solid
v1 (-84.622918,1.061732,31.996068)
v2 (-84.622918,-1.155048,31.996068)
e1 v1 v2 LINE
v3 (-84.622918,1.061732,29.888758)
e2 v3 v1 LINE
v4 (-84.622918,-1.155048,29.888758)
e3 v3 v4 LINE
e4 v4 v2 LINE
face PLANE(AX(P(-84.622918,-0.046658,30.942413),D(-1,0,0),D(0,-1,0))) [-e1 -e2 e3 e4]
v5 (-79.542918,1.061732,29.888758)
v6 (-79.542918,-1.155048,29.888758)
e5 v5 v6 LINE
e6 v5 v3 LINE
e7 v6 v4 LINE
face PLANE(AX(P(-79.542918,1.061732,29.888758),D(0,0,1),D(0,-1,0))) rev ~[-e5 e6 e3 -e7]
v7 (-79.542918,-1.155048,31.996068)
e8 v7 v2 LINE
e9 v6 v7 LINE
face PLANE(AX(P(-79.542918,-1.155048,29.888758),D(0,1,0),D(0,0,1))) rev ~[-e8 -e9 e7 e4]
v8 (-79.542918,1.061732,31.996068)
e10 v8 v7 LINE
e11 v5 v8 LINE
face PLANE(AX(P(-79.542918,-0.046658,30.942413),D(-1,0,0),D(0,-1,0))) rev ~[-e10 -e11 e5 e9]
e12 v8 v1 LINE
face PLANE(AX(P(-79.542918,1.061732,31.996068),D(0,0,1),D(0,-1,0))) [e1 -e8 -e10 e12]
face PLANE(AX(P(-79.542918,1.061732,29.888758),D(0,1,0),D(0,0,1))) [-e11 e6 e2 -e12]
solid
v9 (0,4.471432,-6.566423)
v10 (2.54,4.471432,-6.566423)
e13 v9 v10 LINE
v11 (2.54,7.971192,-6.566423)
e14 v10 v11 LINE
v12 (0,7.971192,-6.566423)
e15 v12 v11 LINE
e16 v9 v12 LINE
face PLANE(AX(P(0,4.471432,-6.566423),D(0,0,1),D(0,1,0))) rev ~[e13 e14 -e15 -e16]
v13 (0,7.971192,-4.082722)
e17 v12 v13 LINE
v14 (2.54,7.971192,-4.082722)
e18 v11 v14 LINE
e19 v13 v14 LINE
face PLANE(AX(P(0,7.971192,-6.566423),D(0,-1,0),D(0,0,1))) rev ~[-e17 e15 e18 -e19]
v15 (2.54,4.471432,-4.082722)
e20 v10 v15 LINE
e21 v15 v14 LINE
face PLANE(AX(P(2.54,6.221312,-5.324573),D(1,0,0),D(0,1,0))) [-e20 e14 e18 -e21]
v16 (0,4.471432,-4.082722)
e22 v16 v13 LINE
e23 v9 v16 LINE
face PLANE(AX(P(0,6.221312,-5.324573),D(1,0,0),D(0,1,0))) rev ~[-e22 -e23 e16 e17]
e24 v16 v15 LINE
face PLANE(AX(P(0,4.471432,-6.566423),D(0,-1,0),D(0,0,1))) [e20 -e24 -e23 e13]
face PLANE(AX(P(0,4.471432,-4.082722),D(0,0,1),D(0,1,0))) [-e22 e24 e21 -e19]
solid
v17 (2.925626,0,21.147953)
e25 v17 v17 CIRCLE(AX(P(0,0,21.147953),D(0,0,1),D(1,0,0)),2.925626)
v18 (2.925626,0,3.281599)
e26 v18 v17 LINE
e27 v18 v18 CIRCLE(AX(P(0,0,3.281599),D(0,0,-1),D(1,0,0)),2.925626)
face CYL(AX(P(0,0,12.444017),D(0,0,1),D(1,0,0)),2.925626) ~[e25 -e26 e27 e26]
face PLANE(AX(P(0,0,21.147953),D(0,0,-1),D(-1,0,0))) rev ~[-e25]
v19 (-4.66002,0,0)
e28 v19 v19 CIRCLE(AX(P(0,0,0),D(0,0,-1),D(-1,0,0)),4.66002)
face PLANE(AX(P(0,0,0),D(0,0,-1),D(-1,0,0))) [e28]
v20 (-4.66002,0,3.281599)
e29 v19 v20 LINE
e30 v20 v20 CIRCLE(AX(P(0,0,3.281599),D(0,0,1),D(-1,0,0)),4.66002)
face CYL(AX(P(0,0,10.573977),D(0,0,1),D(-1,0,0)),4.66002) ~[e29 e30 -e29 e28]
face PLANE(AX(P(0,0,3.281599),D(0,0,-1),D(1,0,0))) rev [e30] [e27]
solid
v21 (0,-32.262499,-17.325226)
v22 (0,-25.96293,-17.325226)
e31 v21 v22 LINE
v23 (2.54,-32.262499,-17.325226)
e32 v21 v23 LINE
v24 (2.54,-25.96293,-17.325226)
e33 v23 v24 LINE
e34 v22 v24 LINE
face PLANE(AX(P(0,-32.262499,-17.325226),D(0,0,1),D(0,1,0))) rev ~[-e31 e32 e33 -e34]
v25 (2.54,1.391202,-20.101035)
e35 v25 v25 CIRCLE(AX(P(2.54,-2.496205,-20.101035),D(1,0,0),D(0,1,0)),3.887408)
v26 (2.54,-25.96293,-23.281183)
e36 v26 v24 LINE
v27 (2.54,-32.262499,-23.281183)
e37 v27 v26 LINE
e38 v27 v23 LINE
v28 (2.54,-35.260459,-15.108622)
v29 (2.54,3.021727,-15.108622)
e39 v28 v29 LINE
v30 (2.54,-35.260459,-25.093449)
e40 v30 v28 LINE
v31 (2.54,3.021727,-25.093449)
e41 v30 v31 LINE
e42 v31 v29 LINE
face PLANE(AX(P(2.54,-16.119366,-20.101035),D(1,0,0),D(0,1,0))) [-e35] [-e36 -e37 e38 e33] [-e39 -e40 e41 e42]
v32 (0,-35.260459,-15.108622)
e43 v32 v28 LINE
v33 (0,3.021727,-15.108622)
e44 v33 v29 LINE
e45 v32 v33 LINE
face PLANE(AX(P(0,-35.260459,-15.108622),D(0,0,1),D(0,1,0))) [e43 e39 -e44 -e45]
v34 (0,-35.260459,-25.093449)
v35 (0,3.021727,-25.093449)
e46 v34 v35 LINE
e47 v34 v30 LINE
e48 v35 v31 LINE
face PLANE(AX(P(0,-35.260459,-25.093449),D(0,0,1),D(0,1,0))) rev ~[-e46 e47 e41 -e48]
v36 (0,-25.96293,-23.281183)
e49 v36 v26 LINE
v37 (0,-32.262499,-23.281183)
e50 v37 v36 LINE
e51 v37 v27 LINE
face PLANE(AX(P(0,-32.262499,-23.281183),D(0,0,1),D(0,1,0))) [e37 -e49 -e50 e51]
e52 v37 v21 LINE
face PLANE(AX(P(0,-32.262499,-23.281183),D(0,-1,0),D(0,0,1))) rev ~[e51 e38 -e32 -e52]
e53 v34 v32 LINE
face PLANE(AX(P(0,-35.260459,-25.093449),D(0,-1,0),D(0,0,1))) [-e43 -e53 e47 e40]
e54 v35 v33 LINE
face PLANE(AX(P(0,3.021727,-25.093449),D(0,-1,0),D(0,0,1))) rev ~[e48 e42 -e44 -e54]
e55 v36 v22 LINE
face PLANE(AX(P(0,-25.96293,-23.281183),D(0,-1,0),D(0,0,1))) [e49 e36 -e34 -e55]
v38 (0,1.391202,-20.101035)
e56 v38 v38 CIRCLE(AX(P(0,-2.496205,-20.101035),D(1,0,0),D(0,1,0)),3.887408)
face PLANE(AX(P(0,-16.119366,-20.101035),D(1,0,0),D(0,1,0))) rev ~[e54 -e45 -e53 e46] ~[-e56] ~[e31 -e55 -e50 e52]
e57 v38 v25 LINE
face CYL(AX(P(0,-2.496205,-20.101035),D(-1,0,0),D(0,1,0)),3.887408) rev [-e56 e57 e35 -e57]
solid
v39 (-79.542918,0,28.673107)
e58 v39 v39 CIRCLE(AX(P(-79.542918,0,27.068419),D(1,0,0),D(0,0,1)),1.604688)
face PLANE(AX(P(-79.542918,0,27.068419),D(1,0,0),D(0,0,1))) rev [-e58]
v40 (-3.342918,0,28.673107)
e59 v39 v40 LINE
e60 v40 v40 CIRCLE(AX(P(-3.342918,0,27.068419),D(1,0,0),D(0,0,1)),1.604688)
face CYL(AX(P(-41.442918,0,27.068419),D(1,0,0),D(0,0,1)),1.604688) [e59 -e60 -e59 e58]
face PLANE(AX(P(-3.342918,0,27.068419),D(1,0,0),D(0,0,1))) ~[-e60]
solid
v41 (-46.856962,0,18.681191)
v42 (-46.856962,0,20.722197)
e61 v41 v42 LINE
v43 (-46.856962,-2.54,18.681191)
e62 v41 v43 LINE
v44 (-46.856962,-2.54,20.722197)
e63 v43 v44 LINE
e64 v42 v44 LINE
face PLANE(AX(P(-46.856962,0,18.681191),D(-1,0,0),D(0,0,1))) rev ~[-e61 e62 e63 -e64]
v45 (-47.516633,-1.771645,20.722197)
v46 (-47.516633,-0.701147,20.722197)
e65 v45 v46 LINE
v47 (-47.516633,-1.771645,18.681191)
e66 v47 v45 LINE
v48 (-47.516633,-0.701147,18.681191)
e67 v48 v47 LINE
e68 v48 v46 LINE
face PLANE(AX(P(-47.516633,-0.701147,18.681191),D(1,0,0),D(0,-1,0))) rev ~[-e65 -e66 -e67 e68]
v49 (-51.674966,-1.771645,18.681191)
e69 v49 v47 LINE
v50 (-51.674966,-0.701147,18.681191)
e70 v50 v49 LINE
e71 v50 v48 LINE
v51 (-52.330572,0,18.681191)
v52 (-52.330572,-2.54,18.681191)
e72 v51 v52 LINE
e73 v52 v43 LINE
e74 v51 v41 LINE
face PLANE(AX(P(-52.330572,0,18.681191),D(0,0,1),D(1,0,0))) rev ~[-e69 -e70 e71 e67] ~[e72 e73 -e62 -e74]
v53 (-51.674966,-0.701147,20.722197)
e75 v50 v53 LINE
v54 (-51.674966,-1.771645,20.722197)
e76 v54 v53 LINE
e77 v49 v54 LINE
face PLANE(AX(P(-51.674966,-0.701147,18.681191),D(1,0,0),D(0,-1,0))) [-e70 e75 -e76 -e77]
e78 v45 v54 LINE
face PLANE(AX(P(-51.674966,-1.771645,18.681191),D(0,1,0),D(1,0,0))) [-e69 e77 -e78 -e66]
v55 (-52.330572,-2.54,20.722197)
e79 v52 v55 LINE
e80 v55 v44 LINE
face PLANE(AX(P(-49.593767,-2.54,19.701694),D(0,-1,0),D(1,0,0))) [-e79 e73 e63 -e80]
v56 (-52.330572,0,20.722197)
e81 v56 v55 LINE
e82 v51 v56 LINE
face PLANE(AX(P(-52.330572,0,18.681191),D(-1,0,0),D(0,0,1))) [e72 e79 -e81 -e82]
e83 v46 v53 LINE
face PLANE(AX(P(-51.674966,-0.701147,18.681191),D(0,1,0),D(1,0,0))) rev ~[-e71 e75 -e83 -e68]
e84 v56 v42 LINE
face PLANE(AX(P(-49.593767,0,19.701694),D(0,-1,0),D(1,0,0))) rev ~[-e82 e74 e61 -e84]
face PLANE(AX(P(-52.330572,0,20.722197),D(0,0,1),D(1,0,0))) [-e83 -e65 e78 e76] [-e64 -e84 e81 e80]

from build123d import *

# Parameters (mm, degrees)
F0_W      = 4.6600201167
F0_H      = 21.1479533464
F2_W      = 76.2
F2_H      = 1.6046876216
F4_W      = 2.5020283647
F4_H      = 18.3248373214
F6_W      = 2.2167799762
F6_H      = 2.1073091775
F7_DEPTH  = 5.08
F10_W     = 38.2821860258
F10_H     = 9.9848276004
F10_W_2   = 6.2995692715
F10_H_2   = 5.9559568763
F10_R     = 3.8874076759
F11_DEPTH = 2.54
F12_W     = 3.4997598268
F12_H     = 2.4837013334
F13_DEPTH = 2.54
F14_W     = 5.4736100137
F14_H     = 2.0410064608
F15_DEPTH = 2.54
F16_W     = 4.1583329439
F16_H     = 1.0704973829
F17_DEPTH = 13.3158767054


# Not quite as in the source:
# - a feature of the source that left no trace in its solid (it failed there, or was rolled back) is left out


with BuildPart() as f1:
    # F0 (on Front) → F1 (revolve)
    with BuildSketch(Plane.XZ):
        with Locations((-2.3300100584, 10.5739766732)):
            Rectangle(F0_W, F0_H)
    revolve(axis=Axis((0, 0, 10.5739766732), (0, 0, -1)))

    # F4 (on Front) → F5 (revolve, cut)
    with BuildSketch(Plane.XZ):
        with Locations((4.1766406503, 12.4440173386)):
            Rectangle(F4_W, F4_H)
    revolve(axis=Axis((0, 0, 21.1479533464), (0, 0, -1)), mode=Mode.SUBTRACT)


with BuildPart() as f3:
    # F2 (on Front) → F3 (revolve)
    with BuildSketch(Plane.XZ):
        with Locations((-41.4429178875, 27.8707629937)):
            Rectangle(F2_W, F2_H)
    revolve(axis=Axis((-41.4429178875, 0, 27.0684191829), (1, 0, 0)))


with BuildPart() as f7:
    # F6 (on face) → F7 (new body)
    with BuildSketch(Plane(origin=(-79.5429178875, 0, 0), x_dir=(0, -1, 0), z_dir=(-1, 0, 0))):
        with Locations((0.046658155, 30.9424130246)):
            Rectangle(F6_W, F6_H)
    extrude(amount=F7_DEPTH)


with BuildPart() as f11:
    # F10 (on Right) → F11 (new body)
    with BuildSketch(Plane.YZ):
        with Locations((-16.1193663953, -20.1010354795)):
            Rectangle(F10_W, F10_H)
        with Locations((-29.1127148084, -20.3032046556)):
            Rectangle(F10_W_2, F10_H_2, mode=Mode.SUBTRACT)
        with Locations((-2.4962052703, -20.1010350138)):
            Circle(F10_R, mode=Mode.SUBTRACT)
    extrude(amount=F11_DEPTH)


with BuildPart() as f13:
    # F12 (on Right) → F13 (new body)
    with BuildSketch(Plane.YZ):
        with Locations((6.2213118654, -5.3245727904)):
            Rectangle(F12_W, F12_H)
    extrude(amount=F13_DEPTH)


with BuildPart() as f15:
    # F14 (on Front) → F15 (new body)
    with BuildSketch(Plane.XZ):
        with Locations((-49.5937671512, 19.7016941383)):
            Rectangle(F14_W, F14_H)
    extrude(amount=F15_DEPTH)

    # F16 (on face) → F17 (cut, through all)
    with BuildSketch(Plane(origin=(0, 0, 18.681190908), x_dir=(1, 0, 0), z_dir=(0, 0, -1))):
        with Locations((-49.5957992971, 1.2363959977)):
            Rectangle(F16_W, F16_H)
    extrude(amount=-F17_DEPTH, mode=Mode.SUBTRACT)


solid = Compound([f1.part, f3.part, f7.part, f11.part, f13.part, f15.part])
